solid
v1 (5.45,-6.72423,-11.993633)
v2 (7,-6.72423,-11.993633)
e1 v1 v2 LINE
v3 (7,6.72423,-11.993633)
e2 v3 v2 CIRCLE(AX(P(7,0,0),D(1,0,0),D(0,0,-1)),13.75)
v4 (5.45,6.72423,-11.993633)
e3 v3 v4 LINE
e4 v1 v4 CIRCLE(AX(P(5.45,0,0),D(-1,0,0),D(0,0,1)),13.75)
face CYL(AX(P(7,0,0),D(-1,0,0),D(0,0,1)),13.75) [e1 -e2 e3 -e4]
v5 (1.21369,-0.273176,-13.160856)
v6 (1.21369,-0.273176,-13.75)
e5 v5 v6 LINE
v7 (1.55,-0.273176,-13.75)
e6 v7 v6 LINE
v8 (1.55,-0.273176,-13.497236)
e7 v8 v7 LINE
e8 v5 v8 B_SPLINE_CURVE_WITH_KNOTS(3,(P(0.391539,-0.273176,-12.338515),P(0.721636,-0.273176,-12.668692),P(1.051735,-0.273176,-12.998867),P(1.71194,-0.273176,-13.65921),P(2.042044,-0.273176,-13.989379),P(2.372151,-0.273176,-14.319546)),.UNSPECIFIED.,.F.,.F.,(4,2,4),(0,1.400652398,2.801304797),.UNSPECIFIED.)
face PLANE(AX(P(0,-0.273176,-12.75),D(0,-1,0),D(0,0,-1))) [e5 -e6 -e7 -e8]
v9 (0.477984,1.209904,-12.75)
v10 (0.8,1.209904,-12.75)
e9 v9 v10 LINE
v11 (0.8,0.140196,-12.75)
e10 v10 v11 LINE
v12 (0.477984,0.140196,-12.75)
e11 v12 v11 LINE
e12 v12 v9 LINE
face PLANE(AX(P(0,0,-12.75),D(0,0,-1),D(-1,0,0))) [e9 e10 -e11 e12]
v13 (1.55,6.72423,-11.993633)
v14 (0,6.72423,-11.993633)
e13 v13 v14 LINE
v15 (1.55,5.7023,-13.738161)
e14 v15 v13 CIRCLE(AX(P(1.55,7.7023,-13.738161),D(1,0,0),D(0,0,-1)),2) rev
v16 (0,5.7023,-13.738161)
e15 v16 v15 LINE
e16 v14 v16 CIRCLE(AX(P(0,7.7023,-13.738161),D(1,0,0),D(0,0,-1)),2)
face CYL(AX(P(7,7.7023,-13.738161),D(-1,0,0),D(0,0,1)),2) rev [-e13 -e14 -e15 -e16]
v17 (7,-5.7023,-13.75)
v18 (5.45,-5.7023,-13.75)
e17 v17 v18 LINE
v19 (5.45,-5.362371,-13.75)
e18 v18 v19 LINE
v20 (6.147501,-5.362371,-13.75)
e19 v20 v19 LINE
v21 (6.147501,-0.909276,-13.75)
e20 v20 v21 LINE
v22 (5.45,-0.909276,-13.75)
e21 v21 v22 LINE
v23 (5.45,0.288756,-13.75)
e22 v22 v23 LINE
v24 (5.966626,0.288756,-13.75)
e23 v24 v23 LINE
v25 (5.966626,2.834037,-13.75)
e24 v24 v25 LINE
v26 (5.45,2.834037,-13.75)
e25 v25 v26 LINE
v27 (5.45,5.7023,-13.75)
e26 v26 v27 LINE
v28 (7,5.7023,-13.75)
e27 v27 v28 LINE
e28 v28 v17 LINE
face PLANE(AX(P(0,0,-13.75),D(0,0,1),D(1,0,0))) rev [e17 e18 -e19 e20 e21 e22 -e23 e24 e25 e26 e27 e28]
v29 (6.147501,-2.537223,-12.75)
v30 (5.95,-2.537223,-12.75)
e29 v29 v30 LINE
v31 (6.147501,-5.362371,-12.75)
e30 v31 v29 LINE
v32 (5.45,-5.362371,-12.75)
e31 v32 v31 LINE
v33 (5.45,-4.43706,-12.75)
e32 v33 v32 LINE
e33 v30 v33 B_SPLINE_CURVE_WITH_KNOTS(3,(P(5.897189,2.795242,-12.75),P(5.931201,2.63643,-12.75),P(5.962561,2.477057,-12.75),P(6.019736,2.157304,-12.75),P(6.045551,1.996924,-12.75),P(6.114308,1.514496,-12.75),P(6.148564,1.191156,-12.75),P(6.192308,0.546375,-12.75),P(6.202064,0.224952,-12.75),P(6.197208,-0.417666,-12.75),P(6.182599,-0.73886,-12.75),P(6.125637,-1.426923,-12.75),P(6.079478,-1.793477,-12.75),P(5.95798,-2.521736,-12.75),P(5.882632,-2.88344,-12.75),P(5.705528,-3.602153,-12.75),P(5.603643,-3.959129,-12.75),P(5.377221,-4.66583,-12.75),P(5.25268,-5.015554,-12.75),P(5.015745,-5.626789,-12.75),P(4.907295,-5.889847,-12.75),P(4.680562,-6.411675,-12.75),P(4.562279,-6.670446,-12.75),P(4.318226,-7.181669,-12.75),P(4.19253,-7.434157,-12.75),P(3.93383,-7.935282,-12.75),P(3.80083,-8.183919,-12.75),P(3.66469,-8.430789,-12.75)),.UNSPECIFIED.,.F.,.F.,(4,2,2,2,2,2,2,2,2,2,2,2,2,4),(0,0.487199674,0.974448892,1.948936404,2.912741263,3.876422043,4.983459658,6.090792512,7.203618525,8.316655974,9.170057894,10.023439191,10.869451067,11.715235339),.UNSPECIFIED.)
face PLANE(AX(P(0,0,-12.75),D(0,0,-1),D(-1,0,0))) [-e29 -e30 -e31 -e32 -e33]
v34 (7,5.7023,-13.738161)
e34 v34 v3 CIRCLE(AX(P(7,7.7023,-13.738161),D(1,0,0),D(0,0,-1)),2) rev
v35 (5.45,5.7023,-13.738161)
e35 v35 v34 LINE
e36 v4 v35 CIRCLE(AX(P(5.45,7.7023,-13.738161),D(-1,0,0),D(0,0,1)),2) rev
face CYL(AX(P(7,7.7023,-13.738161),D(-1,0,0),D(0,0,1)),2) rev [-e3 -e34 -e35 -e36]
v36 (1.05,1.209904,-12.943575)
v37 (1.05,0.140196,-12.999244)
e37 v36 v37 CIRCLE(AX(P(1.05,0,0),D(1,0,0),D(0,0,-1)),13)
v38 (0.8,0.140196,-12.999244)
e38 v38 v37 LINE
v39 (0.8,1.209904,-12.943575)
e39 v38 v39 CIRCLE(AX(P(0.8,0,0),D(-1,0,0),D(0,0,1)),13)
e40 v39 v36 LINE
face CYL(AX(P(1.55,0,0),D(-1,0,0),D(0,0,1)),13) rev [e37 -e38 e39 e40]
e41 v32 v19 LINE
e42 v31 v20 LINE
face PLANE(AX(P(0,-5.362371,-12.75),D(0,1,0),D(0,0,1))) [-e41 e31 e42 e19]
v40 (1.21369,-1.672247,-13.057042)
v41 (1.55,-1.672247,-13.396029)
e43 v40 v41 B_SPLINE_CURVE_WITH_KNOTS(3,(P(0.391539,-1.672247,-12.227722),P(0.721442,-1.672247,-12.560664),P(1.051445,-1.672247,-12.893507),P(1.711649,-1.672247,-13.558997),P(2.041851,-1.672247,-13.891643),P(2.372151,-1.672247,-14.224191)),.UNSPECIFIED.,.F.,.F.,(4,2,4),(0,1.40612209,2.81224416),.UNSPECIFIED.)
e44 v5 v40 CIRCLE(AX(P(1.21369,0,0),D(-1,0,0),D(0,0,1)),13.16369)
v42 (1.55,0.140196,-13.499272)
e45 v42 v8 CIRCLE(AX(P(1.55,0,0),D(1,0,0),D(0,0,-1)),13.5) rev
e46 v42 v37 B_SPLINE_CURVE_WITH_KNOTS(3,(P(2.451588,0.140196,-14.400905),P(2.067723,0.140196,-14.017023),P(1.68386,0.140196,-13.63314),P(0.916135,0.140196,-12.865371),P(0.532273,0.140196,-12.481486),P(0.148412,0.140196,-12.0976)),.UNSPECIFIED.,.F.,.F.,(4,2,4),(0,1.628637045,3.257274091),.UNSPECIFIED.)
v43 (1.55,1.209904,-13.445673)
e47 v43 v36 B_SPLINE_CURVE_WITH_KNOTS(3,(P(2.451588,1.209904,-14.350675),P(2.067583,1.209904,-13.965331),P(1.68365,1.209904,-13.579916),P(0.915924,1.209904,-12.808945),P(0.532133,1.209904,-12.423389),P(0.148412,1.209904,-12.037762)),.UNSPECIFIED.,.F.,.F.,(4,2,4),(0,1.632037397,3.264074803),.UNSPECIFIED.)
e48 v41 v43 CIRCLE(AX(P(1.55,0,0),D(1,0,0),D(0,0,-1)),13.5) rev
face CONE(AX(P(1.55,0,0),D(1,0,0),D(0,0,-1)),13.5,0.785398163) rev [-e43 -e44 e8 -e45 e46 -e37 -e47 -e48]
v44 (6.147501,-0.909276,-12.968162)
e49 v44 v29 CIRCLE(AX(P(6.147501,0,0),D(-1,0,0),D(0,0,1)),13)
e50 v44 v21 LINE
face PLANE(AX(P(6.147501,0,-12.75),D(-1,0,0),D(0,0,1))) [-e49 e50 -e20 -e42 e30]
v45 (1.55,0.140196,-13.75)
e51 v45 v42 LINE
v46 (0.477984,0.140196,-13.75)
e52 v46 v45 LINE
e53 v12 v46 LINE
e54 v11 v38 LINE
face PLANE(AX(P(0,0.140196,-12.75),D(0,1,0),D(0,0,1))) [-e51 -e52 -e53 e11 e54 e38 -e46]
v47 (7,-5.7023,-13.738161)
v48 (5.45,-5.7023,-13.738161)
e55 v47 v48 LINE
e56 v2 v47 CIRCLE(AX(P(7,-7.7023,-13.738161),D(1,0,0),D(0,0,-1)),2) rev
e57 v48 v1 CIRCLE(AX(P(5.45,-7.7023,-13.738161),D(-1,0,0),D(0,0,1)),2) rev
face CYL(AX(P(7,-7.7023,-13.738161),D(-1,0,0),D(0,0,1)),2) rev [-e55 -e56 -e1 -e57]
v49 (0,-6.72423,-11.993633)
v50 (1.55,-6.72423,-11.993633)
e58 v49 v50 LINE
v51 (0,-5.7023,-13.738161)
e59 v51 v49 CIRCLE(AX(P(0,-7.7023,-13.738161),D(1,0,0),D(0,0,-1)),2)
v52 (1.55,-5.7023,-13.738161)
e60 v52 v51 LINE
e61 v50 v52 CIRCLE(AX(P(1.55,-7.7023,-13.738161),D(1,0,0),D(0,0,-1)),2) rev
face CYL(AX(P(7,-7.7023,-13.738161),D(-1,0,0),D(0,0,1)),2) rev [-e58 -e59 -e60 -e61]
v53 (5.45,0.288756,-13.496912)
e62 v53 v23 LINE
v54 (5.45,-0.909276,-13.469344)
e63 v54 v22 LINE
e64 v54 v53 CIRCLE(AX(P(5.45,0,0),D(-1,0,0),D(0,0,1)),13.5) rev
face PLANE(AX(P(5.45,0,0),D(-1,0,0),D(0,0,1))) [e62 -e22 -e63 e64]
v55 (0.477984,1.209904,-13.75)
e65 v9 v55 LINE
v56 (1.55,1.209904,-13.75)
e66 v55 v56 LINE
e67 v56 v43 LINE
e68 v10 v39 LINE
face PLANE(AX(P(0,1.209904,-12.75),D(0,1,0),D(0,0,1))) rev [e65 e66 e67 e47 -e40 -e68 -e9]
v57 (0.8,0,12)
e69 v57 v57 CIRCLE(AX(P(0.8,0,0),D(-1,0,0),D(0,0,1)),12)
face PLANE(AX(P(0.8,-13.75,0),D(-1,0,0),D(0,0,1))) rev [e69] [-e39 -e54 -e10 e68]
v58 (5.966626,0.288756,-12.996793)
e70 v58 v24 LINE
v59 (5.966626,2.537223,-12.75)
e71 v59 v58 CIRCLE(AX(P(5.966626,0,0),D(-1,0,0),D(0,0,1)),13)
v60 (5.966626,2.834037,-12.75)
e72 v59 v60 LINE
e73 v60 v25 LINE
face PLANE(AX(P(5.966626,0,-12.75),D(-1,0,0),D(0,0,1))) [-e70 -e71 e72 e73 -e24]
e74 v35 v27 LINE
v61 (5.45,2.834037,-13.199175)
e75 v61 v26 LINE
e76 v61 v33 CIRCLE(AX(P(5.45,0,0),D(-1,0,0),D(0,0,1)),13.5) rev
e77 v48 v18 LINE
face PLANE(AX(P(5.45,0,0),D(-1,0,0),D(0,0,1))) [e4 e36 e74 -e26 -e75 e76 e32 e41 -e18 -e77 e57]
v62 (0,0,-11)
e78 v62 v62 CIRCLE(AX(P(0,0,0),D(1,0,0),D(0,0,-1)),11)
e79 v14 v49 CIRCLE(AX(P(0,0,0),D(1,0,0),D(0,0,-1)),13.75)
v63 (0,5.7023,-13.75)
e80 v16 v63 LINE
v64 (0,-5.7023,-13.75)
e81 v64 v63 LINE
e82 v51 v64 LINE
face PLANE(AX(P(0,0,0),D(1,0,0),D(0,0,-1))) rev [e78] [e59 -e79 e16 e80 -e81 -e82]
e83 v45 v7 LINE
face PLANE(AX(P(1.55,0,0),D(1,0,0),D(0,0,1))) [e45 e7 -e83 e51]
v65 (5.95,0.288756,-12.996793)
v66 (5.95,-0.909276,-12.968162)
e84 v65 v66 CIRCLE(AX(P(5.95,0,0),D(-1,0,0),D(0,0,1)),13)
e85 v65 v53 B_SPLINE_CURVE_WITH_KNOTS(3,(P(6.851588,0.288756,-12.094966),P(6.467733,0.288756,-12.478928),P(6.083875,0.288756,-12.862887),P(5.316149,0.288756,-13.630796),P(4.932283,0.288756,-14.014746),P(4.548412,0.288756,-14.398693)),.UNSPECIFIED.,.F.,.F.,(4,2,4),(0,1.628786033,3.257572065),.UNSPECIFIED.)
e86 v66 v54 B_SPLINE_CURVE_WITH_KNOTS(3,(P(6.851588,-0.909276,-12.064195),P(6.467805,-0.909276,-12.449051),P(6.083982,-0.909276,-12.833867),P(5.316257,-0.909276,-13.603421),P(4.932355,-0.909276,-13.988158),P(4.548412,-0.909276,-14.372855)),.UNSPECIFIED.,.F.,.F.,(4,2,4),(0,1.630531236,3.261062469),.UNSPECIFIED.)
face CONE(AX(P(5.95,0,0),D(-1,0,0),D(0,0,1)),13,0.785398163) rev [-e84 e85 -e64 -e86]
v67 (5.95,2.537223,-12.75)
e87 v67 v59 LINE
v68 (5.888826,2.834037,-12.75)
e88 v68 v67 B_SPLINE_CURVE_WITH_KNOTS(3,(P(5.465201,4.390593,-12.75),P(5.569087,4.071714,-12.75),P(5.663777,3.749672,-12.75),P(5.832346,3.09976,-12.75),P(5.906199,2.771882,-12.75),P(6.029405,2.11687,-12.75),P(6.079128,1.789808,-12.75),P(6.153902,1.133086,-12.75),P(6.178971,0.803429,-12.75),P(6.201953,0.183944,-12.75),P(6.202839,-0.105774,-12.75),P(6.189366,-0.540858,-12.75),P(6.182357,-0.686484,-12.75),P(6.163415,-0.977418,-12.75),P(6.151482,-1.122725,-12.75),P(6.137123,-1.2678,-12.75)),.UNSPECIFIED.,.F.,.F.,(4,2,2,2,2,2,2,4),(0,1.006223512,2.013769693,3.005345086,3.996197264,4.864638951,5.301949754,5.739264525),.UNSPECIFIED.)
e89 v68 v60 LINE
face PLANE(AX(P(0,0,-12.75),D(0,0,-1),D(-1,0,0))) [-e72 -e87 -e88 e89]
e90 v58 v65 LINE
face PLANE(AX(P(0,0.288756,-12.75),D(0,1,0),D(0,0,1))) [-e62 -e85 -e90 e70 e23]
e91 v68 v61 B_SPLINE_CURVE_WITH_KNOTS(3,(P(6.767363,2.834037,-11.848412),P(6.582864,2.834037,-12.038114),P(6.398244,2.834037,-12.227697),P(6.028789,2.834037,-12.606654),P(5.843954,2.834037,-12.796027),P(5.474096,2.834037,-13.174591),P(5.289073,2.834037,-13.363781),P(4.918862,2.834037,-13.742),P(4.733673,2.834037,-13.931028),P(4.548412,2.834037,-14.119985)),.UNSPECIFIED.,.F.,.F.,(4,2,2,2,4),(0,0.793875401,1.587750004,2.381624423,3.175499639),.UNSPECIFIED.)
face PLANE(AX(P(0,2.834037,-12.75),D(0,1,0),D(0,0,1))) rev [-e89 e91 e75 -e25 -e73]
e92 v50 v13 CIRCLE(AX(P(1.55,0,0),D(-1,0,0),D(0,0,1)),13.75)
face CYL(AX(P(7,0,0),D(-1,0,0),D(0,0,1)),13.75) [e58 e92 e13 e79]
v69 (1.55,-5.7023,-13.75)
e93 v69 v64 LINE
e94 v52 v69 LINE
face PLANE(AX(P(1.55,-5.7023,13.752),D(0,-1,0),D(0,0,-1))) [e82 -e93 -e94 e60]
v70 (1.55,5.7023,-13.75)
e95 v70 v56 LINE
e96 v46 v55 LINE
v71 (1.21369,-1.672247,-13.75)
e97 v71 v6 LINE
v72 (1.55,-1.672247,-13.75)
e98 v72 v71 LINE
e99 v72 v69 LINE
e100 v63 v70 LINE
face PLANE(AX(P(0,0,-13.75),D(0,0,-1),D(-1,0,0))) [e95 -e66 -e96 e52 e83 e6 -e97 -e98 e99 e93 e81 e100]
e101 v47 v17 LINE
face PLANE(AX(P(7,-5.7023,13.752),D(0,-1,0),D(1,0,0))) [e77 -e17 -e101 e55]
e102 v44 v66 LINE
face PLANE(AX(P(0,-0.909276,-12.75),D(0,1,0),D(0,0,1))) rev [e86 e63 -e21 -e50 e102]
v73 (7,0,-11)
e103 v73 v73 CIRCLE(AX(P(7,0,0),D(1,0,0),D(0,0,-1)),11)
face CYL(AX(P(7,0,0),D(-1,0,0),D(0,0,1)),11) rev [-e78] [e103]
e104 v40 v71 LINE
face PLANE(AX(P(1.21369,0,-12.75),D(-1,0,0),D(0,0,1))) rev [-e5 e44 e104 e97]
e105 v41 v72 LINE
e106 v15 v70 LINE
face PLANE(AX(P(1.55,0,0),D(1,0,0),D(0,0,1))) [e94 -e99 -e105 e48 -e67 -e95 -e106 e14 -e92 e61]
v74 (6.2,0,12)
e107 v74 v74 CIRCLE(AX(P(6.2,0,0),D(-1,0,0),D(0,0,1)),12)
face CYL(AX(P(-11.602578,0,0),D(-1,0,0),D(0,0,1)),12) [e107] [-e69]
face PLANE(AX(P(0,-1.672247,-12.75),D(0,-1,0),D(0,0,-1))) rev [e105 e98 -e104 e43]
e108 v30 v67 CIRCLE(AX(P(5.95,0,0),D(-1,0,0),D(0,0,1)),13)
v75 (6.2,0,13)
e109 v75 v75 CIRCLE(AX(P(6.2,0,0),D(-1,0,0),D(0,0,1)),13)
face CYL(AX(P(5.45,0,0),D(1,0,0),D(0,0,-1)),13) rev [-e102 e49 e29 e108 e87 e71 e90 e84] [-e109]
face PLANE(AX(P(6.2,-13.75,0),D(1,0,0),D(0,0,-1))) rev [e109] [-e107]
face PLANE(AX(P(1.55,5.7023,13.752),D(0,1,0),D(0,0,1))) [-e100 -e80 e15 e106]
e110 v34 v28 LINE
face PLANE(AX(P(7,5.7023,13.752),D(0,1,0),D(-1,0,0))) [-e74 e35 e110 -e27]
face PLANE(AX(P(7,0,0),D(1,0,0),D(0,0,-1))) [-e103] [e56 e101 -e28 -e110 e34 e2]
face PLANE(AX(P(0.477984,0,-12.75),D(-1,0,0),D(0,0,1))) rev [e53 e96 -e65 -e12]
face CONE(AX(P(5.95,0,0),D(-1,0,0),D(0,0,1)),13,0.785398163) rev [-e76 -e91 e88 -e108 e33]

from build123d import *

# Parameters (mm, degrees)
SKETCH6_R                = 13.75
SKETCH6_R_2              = 11
BOSS_EXTRUDE2_DEPTH      = 7
SKETCH4_W                = 5.4
SKETCH4_H                = 1.75
BOSS_EXTRUDE3_REACH      = 30.322
SKETCH9_W                = 7
SKETCH9_H                = 9.16515139
BOSS_EXTRUDE4_START      = 0.75
SKETCH10_R               = 13.75
SKETCH10_R_2             = 13
BOSS_EXTRUDE4_DEPTH      = 0.75
CHAMFER1_SIZE            = 0.5
CHAMFER1_OF_MIRROR1_SIZE = 0.5
BOSS_EXTRUDE5_DEPTH      = 1.55
BOSS_EXTRUDE5_START      = 5.45
BOSS_EXTRUDE5_2_DEPTH    = 1.55
FILLET1_R                = 2
SKETCH12_W               = 1.554666846
SKETCH12_H               = 4.45309529
SKETCH12_W_2             = 1.373791393
SKETCH12_H_2             = 2.545281327
SKETCH12_W_3             = 0.712647602
SKETCH12_H_3             = 1.069707629
SKETCH12_W_4             = 1.072015963
SKETCH12_W_5             = 0.597408117
SKETCH12_H_4             = 1.399070537
SKETCH12_W_6             = 0.336309622
CUT_EXTRUDE1_DEPTH       = 1
SKETCH14_R               = 11
CUT_EXTRUDE2_DEPTH       = 21.667002685


# Read off the part's stored shape, not the designer's step: Boss-Extrude5
with BuildPart() as part:
    # Sketch6 → Boss-Extrude2 (new body)
    with BuildSketch(Plane(origin=(0, 0, 0), x_dir=(0, 0, -1), z_dir=(1, 0, 0))):
        Circle(SKETCH6_R)
        Circle(SKETCH6_R_2, mode=Mode.SUBTRACT)
    extrude(amount=BOSS_EXTRUDE2_DEPTH)

    # Sketch4 → Cut-Revolve1 (revolve, cut)
    with BuildSketch(Plane.XY, mode=Mode.PRIVATE) as cut_revolve1_sk:
        with Locations((3.5, -12.875)):
            Rectangle(SKETCH4_W, SKETCH4_H)
    revolve(cut_revolve1_sk.sketch.rotate(Axis((-11.602577702, 0, 0), (1, 0, 0)), 270), axis=Axis((-11.602577702, 0, 0), (1, 0, 0)), mode=Mode.SUBTRACT)

    # Sketch9 → Boss-Extrude3 (add, up to next)
    with BuildSketch(Plane.XY.offset(-10), mode=Mode.PRIVATE) as boss_extrude3_sk1:
        with Locations((3.5, 0)):
            Rectangle(SKETCH9_W, SKETCH9_H)
    boss_extrude3_tool1 = extrude(boss_extrude3_sk1.sketch, amount=-BOSS_EXTRUDE3_REACH, mode=Mode.PRIVATE) - part.part
    add(boss_extrude3_tool1.solids().sort_by_distance((3.5, 0, -10))[0])

    # Sketch10 → Boss-Extrude4 (add)
    with BuildSketch(Plane.ZY.offset(-6.2).offset(BOSS_EXTRUDE4_START)):
        Circle(SKETCH10_R)
        Circle(SKETCH10_R_2, mode=Mode.SUBTRACT)
    boss_extrude4 = extrude(amount=-BOSS_EXTRUDE4_DEPTH)

    # Chamfer1
    chamfer1_edges = [part.edges().sort_by_distance(p)[0] for p in [
        (5.45, 0, -13),
    ]]
    chamfer(chamfer1_edges, length=CHAMFER1_SIZE)

    # Mirror1: Boss-Extrude4 across plane
    add(boss_extrude4.mirror(Plane.ZY.offset(-3.5)))

    # Chamfer1 of Mirror1
    chamfer1_of_mirror1_edges = [part.edges().sort_by_distance(p)[0] for p in [
        (1.55, 0, -13),
    ]]
    chamfer(chamfer1_of_mirror1_edges, length=CHAMFER1_OF_MIRROR1_SIZE)

    # Boss-Extrude5 outline → Boss-Extrude5 (add)
    with BuildSketch(Plane.YZ):
        with BuildLine():
            ThreePointArc((0, -13.75), (-2.917586852, -13.436896478), (-5.7023, -12.511845376))
            Line((-5.7023, -12.511845376), (-5.7023, -13.75))
            Line((-5.7023, -13.75), (0, -13.75))
        make_face()
        with BuildLine():
            ThreePointArc((5.7023, -12.511845376), (2.917586852, -13.436896478), (0, -13.75))
            Line((0, -13.75), (5.7023, -13.75))
            Line((5.7023, -13.75), (5.7023, -12.511845376))
        make_face()
    extrude(amount=BOSS_EXTRUDE5_DEPTH)

    # Boss-Extrude5 2 outline → Boss-Extrude5 2 (add)
    with BuildSketch(Plane.YZ.offset(BOSS_EXTRUDE5_START)):
        with BuildLine():
            ThreePointArc((0, -13.75), (-2.917586852, -13.436896478), (-5.7023, -12.511845376))
            Line((-5.7023, -12.511845376), (-5.7023, -13.75))
            Line((-5.7023, -13.75), (0, -13.75))
        make_face()
        with BuildLine():
            ThreePointArc((5.7023, -12.511845376), (2.917586852, -13.436896478), (0, -13.75))
            Line((0, -13.75), (5.7023, -13.75))
            Line((5.7023, -13.75), (5.7023, -12.511845376))
        make_face()
    extrude(amount=BOSS_EXTRUDE5_2_DEPTH)

    # Fillet1
    fillet1_edges = [part.edges().sort_by_distance(p)[0] for p in [
        (6.225, -5.7023, -12.511845376),
        (6.225, 5.7023, -12.511845376),
        (0.775, -5.7023, -12.511845376),
        (0.775, 5.7023, -12.511845376),
    ]]
    fillet(fillet1_edges, radius=FILLET1_R)

    # Sketch12 → Cut-Extrude1 (cut)
    with BuildSketch(Plane(origin=(0, 0, -13.75), x_dir=(-1, 0, 0), z_dir=(0, 0, -1))):
        with Locations((-5.370167958, -3.135823217)):
            Rectangle(SKETCH12_W, SKETCH12_H)
        Polygon((-4.592834535, -0.909275572), (-4.592834535, -1.672246677), (-3.997102403, -1.672246677), (-3.997102403, -0.27317614), (-5.19036655, -0.27317614), (-5.19036655, -0.909275572), align=None)
        with Locations((-5.279730232, 1.561396449)):
            Rectangle(SKETCH12_W_2, SKETCH12_H_2)
        with Locations((-1.906323801, 0.675050165)):
            Rectangle(SKETCH12_W_3, SKETCH12_H_3)
        with Locations((-1.013992018, 0.675050165)):
            Rectangle(SKETCH12_W_4, SKETCH12_H_3)
        with Locations((-1.848704059, -0.972711409)):
            Rectangle(SKETCH12_W_5, SKETCH12_H_4)
        with Locations((-1.381845189, -0.972711409)):
            Rectangle(SKETCH12_W_6, SKETCH12_H_4)
    extrude(amount=-CUT_EXTRUDE1_DEPTH, mode=Mode.SUBTRACT)

    # Sketch14 → Cut-Extrude2 (cut, through all)
    with BuildSketch(Plane(origin=(7, 0, 0), x_dir=(0, 0, -1), z_dir=(1, 0, 0))):
        Circle(SKETCH14_R)
    extrude(amount=-CUT_EXTRUDE2_DEPTH, mode=Mode.SUBTRACT)


solid = part.part
